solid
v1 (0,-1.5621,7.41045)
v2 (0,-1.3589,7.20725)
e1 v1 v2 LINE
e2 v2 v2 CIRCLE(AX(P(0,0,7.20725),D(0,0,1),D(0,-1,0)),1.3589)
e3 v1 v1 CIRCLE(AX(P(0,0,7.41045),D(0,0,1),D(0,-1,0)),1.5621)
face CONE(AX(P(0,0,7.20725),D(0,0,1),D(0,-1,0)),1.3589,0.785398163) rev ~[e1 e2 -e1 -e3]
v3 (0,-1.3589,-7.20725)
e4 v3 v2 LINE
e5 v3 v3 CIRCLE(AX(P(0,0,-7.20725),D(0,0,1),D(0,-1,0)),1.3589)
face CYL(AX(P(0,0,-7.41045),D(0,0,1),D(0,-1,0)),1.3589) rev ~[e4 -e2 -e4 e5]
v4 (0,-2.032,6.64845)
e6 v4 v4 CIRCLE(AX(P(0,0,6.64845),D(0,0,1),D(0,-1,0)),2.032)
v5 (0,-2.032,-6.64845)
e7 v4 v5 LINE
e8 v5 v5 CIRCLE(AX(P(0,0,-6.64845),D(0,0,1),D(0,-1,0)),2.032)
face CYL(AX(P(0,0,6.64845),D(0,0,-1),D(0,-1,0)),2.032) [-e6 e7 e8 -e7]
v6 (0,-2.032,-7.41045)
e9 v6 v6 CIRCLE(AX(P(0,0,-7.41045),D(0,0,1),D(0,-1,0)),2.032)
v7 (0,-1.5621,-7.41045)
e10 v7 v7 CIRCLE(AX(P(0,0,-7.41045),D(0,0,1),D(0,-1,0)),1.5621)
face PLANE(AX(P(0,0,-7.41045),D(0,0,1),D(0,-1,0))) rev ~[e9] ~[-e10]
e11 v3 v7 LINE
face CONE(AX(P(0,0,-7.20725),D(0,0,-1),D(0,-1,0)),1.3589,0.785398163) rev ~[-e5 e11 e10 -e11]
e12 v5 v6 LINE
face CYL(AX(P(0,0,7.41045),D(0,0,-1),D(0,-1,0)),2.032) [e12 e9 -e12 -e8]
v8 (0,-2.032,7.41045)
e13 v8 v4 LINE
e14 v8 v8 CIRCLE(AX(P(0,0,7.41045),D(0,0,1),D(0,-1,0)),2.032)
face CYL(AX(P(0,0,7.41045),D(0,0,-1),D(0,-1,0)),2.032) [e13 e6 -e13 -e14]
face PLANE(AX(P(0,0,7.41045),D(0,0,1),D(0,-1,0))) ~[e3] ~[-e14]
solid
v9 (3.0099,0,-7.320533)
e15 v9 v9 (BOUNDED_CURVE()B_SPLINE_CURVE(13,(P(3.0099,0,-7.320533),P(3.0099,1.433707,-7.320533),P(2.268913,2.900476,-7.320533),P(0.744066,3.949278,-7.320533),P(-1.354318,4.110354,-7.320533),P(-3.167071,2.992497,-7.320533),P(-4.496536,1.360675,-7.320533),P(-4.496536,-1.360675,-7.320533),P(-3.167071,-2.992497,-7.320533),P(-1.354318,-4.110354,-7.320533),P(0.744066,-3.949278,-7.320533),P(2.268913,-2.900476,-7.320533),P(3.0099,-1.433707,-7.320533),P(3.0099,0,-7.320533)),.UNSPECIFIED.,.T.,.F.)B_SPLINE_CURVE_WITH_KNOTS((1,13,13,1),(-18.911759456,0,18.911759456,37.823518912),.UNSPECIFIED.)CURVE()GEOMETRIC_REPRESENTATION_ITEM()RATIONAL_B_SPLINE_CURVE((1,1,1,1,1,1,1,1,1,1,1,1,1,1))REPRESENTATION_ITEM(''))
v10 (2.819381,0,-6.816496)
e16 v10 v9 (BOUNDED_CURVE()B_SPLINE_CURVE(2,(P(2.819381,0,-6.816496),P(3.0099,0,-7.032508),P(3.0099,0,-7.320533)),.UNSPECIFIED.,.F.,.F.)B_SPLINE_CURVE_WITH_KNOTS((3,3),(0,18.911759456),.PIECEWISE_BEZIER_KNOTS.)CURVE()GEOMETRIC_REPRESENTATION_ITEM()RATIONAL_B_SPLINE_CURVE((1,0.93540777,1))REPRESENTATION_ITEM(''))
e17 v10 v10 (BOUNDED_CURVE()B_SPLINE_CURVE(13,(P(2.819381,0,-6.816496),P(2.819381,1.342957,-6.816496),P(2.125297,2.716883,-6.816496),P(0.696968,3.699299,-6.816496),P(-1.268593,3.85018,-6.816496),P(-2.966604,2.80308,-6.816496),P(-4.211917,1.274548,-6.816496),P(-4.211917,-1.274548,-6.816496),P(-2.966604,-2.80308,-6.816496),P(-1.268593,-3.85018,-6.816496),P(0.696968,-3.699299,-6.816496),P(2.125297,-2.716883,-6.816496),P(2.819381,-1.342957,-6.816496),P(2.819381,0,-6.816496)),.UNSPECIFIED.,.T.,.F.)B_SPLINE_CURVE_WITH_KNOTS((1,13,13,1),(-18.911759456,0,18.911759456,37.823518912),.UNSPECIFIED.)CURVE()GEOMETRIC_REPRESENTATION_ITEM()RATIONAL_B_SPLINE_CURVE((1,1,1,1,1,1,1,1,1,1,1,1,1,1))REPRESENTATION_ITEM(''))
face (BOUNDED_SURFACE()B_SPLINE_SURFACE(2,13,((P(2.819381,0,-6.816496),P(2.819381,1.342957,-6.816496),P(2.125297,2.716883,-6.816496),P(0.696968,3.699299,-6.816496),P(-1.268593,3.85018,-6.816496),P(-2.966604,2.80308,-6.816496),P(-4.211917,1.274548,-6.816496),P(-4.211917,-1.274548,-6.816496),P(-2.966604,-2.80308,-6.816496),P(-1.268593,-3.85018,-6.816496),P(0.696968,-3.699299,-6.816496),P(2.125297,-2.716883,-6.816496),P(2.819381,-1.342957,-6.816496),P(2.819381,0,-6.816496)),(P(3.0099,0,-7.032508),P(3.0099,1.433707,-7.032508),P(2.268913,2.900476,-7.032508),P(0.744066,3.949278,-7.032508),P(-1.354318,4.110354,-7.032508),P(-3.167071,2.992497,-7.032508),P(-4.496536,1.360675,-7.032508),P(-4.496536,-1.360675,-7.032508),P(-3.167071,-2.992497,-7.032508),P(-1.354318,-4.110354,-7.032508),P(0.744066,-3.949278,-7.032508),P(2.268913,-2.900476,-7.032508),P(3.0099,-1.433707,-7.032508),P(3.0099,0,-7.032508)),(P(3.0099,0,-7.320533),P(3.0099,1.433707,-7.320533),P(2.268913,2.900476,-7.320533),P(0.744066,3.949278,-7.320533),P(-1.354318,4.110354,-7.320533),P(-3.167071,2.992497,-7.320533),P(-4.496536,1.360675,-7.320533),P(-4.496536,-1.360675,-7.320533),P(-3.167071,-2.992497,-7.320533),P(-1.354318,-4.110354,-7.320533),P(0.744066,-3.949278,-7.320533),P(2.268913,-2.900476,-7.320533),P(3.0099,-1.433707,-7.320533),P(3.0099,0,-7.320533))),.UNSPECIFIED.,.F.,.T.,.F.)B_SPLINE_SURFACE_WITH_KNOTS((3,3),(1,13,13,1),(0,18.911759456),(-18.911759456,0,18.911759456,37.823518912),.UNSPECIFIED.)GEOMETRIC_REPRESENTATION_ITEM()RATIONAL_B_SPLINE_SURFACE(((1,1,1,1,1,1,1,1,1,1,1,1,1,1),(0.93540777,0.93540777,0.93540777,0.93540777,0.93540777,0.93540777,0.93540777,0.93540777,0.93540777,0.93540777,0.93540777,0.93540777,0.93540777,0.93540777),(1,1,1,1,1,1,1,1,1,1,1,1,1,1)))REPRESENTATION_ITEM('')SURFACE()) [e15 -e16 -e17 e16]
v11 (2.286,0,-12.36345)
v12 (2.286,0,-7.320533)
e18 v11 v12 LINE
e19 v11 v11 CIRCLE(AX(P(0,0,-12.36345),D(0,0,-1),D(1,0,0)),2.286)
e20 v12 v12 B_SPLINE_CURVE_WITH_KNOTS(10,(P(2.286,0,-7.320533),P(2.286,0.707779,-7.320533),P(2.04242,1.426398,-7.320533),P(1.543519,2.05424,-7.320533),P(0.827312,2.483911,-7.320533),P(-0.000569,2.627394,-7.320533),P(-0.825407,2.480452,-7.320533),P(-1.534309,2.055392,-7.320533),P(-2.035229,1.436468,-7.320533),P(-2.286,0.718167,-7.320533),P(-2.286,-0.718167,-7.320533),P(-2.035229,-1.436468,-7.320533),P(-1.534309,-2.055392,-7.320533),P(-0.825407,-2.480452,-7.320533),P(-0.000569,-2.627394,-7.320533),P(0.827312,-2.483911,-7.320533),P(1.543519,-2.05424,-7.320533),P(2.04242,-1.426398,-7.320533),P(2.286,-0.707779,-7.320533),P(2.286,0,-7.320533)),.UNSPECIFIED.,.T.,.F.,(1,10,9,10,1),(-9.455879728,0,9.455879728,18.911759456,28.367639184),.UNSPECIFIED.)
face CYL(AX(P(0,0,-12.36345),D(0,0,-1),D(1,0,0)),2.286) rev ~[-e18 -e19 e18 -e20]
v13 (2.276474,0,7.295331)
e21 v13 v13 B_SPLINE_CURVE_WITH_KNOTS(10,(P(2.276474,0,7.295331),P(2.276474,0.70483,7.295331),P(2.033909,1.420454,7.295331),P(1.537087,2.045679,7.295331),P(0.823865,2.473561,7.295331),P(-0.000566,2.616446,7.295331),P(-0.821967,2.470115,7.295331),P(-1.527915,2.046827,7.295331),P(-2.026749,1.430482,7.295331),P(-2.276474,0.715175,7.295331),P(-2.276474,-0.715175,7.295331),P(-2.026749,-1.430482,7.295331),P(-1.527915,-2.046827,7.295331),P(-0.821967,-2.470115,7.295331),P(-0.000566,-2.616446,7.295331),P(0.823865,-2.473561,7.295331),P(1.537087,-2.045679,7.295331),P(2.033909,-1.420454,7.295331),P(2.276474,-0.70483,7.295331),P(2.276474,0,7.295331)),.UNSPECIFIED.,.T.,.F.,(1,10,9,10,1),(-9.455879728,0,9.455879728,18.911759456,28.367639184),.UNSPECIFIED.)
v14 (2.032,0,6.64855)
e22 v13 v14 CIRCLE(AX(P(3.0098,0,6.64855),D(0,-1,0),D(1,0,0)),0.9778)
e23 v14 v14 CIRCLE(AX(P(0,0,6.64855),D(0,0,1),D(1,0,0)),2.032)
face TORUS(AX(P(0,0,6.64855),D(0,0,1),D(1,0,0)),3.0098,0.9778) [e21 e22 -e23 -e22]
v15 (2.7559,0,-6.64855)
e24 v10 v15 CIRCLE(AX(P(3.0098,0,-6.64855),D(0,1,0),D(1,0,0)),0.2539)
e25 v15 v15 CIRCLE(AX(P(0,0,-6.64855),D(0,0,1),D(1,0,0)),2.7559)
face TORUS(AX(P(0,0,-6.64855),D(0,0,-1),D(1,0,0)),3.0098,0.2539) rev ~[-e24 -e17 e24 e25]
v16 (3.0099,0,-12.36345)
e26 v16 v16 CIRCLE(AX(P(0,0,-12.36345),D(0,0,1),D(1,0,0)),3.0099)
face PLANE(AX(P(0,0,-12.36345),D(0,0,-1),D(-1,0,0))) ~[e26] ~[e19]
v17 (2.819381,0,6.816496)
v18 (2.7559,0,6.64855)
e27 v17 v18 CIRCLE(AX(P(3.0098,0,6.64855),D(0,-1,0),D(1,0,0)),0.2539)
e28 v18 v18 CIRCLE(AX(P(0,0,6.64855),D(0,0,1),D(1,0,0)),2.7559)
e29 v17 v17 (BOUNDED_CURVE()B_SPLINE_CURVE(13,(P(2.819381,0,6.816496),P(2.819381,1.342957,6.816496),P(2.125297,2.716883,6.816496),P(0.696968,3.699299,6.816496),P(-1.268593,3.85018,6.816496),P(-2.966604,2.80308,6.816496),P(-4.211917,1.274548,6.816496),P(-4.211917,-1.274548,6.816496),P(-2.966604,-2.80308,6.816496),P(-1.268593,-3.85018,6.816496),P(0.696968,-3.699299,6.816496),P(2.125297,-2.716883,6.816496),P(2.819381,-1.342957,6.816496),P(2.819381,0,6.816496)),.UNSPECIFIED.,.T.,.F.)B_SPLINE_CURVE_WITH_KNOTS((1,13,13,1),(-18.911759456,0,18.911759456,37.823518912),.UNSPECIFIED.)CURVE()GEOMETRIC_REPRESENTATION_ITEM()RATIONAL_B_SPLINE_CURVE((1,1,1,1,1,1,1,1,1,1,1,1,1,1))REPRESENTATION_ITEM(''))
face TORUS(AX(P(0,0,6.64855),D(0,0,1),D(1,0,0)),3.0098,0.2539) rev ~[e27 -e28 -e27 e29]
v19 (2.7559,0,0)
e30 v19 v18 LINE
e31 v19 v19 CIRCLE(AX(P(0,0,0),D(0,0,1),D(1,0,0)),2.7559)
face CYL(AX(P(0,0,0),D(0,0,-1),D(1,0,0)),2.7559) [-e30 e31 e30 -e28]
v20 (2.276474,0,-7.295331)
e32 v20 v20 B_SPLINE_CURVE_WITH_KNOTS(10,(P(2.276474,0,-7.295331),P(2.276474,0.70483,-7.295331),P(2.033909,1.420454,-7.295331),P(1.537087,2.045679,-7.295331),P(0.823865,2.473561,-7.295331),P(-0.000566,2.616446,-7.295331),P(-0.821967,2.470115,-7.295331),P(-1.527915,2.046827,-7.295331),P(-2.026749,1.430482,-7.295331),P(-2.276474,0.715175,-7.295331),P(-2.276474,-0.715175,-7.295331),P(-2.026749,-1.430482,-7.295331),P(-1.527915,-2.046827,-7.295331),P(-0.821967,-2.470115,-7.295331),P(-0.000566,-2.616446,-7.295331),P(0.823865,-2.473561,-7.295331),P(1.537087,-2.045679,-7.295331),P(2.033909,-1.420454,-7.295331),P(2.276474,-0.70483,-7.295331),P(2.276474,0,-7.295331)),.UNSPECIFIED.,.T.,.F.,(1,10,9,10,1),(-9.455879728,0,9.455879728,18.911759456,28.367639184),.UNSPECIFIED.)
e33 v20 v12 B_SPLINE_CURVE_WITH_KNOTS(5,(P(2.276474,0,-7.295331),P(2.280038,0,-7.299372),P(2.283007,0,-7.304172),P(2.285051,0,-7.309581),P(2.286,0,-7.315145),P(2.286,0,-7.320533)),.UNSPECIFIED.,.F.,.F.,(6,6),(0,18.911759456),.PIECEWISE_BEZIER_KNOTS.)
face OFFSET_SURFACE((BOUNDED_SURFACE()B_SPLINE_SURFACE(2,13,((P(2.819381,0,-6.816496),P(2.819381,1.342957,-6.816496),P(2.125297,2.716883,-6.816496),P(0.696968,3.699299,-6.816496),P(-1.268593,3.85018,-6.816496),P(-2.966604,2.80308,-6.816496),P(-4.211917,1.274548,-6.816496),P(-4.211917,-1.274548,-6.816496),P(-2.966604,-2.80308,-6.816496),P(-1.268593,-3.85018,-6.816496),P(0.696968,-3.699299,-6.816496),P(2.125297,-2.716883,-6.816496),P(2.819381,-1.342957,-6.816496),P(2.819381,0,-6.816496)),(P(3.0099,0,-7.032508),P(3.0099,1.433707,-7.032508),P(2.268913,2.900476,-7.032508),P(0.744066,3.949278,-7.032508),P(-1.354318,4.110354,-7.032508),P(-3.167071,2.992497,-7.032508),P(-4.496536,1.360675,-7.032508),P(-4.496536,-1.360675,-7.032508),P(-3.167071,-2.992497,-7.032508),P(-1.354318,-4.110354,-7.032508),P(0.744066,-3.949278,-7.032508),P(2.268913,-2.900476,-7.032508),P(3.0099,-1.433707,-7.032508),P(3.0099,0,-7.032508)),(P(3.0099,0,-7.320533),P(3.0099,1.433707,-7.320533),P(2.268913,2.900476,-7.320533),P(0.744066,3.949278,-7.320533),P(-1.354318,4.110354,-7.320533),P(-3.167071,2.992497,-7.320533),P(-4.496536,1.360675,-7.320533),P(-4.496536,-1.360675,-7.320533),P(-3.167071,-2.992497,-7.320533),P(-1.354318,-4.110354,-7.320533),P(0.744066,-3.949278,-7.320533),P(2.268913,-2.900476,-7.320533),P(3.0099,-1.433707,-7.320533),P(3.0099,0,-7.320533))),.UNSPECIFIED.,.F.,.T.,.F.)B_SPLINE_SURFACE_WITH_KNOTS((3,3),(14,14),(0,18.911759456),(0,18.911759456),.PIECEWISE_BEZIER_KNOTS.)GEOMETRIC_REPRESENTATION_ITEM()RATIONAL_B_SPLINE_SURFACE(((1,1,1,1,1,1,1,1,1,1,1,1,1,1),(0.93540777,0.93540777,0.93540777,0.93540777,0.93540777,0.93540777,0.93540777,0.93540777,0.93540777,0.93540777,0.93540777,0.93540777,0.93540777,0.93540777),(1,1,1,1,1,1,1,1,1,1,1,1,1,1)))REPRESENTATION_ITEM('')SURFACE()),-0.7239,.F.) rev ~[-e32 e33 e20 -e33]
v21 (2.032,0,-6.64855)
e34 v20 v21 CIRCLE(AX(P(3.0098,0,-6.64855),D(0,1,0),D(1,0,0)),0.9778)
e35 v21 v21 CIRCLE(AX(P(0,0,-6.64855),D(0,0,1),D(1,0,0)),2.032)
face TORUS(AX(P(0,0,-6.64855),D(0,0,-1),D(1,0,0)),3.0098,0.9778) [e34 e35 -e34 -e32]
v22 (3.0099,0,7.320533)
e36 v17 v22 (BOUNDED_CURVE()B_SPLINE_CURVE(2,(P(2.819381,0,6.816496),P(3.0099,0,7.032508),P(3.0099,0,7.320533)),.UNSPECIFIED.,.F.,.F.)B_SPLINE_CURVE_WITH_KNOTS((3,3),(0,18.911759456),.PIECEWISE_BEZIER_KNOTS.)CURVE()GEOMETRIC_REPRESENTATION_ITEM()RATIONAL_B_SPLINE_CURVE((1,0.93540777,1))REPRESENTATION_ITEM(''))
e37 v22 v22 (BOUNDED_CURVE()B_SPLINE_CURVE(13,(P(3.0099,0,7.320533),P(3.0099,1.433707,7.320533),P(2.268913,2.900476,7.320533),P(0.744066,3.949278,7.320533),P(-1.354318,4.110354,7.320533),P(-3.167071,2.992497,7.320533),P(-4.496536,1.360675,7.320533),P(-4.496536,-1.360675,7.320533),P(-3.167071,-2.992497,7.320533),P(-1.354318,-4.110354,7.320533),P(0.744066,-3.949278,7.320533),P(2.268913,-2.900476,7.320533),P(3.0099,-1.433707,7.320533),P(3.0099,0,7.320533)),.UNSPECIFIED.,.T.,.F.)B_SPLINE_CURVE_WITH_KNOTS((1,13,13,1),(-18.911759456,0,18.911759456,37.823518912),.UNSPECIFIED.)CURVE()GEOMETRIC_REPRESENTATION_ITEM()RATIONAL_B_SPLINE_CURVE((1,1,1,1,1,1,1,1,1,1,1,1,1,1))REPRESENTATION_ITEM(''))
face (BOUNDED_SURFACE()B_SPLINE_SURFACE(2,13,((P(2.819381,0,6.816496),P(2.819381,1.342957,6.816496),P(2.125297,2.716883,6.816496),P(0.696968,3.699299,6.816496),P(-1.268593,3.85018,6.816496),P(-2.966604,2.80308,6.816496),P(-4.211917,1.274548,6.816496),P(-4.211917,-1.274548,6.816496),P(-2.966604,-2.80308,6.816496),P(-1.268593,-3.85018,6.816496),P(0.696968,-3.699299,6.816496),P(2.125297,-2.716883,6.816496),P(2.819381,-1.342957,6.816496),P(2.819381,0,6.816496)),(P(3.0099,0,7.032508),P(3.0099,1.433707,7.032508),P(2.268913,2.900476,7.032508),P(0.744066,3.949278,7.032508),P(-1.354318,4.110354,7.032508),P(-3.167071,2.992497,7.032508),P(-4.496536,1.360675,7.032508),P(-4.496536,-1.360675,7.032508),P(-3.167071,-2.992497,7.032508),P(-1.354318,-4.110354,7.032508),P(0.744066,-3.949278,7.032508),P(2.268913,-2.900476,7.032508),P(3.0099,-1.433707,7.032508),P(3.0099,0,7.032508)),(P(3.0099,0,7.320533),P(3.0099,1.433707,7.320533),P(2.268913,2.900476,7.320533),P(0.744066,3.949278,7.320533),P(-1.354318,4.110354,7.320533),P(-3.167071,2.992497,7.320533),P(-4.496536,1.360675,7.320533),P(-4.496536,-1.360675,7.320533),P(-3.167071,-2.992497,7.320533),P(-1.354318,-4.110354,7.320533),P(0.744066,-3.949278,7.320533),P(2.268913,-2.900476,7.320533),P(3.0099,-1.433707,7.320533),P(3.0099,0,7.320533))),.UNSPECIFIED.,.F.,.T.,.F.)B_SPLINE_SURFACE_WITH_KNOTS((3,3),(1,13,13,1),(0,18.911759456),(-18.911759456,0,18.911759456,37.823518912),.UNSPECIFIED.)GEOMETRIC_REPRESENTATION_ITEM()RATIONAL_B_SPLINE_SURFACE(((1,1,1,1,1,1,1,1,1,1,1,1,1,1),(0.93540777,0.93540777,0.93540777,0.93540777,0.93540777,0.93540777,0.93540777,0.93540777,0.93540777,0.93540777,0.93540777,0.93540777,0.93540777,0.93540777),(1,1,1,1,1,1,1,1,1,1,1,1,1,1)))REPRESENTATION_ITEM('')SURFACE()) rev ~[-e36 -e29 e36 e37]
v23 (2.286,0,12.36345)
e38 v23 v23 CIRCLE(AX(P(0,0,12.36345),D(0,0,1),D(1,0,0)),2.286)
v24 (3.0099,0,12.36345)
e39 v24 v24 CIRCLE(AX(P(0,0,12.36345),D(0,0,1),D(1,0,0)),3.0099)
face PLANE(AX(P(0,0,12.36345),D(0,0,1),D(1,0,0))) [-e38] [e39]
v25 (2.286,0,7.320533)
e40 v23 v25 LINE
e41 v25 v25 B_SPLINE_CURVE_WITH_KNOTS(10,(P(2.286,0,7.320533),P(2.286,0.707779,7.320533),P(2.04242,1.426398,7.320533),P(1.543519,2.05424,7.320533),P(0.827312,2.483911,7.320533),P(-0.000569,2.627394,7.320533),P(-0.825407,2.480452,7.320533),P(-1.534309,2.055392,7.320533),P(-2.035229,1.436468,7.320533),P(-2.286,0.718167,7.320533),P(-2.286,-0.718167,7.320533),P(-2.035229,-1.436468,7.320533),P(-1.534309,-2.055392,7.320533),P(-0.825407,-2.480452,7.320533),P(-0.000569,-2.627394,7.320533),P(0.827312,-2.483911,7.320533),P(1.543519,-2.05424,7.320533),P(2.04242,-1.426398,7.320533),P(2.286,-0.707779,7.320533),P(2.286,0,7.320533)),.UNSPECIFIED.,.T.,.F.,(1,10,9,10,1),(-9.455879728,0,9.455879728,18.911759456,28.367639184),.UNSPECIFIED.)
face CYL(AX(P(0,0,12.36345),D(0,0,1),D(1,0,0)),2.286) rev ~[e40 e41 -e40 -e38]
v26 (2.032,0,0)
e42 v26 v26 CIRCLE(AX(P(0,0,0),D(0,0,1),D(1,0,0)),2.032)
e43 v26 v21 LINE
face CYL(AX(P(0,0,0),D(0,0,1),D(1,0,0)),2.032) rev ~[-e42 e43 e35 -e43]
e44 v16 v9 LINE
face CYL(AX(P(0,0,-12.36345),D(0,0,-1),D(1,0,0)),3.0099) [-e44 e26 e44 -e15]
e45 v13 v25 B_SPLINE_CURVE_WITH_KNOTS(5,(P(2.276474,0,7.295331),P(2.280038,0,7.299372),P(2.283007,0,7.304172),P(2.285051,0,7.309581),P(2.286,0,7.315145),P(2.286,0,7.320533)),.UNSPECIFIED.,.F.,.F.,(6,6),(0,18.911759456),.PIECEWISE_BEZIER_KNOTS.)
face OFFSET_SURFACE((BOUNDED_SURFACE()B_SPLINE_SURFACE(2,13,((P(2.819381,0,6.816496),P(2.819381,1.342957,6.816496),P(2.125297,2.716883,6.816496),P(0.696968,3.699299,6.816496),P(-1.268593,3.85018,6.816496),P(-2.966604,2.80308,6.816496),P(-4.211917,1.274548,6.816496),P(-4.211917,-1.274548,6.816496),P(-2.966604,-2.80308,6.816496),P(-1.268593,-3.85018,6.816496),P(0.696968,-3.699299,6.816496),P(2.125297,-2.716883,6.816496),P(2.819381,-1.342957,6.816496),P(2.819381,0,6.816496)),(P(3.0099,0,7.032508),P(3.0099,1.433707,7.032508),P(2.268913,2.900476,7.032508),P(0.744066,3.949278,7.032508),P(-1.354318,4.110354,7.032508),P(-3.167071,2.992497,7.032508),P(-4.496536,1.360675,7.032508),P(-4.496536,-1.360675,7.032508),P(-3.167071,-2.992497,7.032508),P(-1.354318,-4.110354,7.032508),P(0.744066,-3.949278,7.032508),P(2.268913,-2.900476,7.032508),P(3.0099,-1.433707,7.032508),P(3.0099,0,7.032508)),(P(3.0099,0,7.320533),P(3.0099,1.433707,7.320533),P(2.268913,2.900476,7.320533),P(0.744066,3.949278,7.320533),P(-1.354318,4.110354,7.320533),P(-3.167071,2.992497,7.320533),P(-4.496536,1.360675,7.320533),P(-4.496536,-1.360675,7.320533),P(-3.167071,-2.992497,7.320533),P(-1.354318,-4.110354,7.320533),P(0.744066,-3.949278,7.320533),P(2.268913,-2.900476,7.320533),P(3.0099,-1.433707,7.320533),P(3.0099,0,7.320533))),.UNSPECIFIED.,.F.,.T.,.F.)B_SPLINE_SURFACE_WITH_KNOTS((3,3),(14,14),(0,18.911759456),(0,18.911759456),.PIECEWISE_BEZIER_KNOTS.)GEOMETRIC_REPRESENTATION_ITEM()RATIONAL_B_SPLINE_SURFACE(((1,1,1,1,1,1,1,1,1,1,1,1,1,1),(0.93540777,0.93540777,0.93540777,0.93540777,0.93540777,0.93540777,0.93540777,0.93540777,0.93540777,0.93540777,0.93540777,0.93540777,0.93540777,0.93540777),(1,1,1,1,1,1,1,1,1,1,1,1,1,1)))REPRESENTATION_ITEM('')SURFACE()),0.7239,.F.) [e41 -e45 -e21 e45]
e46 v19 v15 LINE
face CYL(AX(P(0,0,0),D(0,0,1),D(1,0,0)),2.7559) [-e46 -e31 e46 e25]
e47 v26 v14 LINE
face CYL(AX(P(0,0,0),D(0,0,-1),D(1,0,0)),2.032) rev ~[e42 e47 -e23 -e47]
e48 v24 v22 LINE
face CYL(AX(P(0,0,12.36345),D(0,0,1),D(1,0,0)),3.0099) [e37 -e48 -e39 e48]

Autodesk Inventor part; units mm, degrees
ref_plane "YZ Plane" through (0, 0, 0) normal (1, 0, 0) x (0, 1, 0)
ref_plane "XZ Plane" through (0, 0, 0) normal (0, 1, 0) x (-1, 0, 0)
ref_plane "XY Plane" through (0, 0, 0) normal (0, 0, 1) x (1, 0, 0)
sketch "Sketch1" plane through (0, 0, 0) normal (0, 0, 1) x (1, 0, 0)
  circle A0 centre (0, 0) radius 2.7559
  dimension "d0" = 5.5118
extrude "Extrusion1" add sketch "Sketch1" along normal mid plane 24.7269
sketch "Sketch2" plane through (0, 0, 12.36345) normal (0, 0, 1) x (1, 0, 0)
  circle A0 centre (0, 0) radius 2.7559 projected
  circle A1 centre (0, 0) radius 3.0099
  dimension "d3" = 6.0198
extrude "Extrusion2" add sketch "Sketch2" against normal blind 5.461
fillet "Fillet1" radius 0.254 1 edges at (-2.7559, 0, 6.9024)
fillet "Fillet2" radius 0.762 2 edges at (-3.0098, 0, 6.9024) (-3.0099, 0, 6.9024)
mirror "Mirror1" about plane through (0, 0, 0) normal (0, 0, 1) of "Extrusion2", "Fillet1", "Fillet2"
shell "Shell1" thickness 0.7239 removed faces 2 at (0.974146, -1.090517, -12.36345) at (0.974146, -1.090517, 12.36345)
sketch "Sketch3" plane through (0, 0, 0) normal (1, 0, 0) x (0, 1, 0)
  arc A0 (-3.0099, 7.320471) -> (-2.8194, 6.816455) centre (-2.2479, 7.320471) ccw
  line L0 (-3.0099, 7.320471) -> (-3.0099, 12.36345)
  line L1 (-3.0099, 12.36345) -> (-2.286, 12.36345)
  line L2 (-2.286, 12.36345) -> (-2.286, 7.320471)
  arc A1 (-2.286, 7.320471) -> (-2.276475, 7.29527) centre (-2.2479, 7.320471) ccw
  arc A2 (-2.032, 6.64845) -> (-2.276475, 7.29527) centre (-3.0099, 6.64845) ccw
  line L3 (-2.032, 6.64845) -> (-2.032, -6.64845)
  arc A3 (-2.276475, -7.29527) -> (-2.032, -6.64845) centre (-3.0099, -6.64845) ccw
  arc A4 (-2.276475, -7.29527) -> (-2.286, -7.320471) centre (-2.2479, -7.320471) ccw
  line L4 (-2.286, -7.320471) -> (-2.286, -12.36345)
  line L5 (-2.286, -12.36345) -> (-3.0099, -12.36345)
  line L6 (-3.0099, -12.36345) -> (-3.0099, -7.320471)
  arc A5 (-2.8194, -6.816455) -> (-3.0099, -7.320471) centre (-2.2479, -7.320471) ccw
  arc A6 (-2.8194, -6.816455) -> (-2.7559, -6.64845) centre (-3.0099, -6.64845) ccw
  line L7 (-2.7559, -6.64845) -> (-2.7559, 6.64845)
  arc A7 (-2.7559, 6.64845) -> (-2.8194, 6.816455) centre (-3.0099, 6.64845) ccw
  arc A8 (2.8194, 6.816455) -> (3.0099, 7.320471) centre (2.2479, 7.320471) ccw
  arc A9 (2.8194, 6.816455) -> (2.7559, 6.64845) centre (3.0099, 6.64845) ccw
  line L8 (2.7559, 6.64845) -> (2.7559, -6.64845)
  arc A10 (2.7559, -6.64845) -> (2.8194, -6.816455) centre (3.0099, -6.64845) ccw
  arc A11 (3.0099, -7.320471) -> (2.8194, -6.816455) centre (2.2479, -7.320471) ccw
  line L9 (3.0099, -7.320471) -> (3.0099, -12.36345)
  line L10 (3.0099, -12.36345) -> (2.286, -12.36345)
  line L11 (2.286, -12.36345) -> (2.286, -7.320471)
  arc A12 (2.286, -7.320471) -> (2.276475, -7.29527) centre (2.2479, -7.320471) ccw
  arc A13 (2.032, -6.64845) -> (2.276475, -7.29527) centre (3.0099, -6.64845) ccw
  line L12 (2.032, -6.64845) -> (2.032, 6.64845)
  arc A14 (2.276475, 7.29527) -> (2.032, 6.64845) centre (3.0099, 6.64845) ccw
  arc A15 (2.276475, 7.29527) -> (2.286, 7.320471) centre (2.2479, 7.320471) ccw
  line L13 (2.286, 7.320471) -> (2.286, 12.36345)
  line L14 (2.286, 12.36345) -> (3.0099, 12.36345)
  line L15 (3.0099, 12.36345) -> (3.0099, 7.320471)
  line L16 (-2.032, -7.41045) -> (-1.3589, -7.41045)
  line L17 (-1.3589, -7.41045) -> (-1.3589, 7.41045)
  line L18 (-1.3589, 7.41045) -> (-2.032, 7.41045)
  line L19 (-2.032, 7.41045) -> (-2.032, -7.41045)
  line L20 (0, -17.30883) -> (0, 17.30883)
  point P0 (0, 0)
  dimension "d9" = 0.6731
  dimension "d10" = 0.762
  dimension "d11" = 0.762
revolve "Revolution1" add sketch "Sketch3" angle 360 about axis through (0, 0, -10) along (0, 0, 1) separate body contours L19 L18 L17 L16 L3
chamfer "Chamfer1" distance 0.2032 angle 45 2 edges at (0, 1.3589, 7.4105) (0, 1.3589, -7.4105)
properties part number "point 107 double sided femal tube blue"
